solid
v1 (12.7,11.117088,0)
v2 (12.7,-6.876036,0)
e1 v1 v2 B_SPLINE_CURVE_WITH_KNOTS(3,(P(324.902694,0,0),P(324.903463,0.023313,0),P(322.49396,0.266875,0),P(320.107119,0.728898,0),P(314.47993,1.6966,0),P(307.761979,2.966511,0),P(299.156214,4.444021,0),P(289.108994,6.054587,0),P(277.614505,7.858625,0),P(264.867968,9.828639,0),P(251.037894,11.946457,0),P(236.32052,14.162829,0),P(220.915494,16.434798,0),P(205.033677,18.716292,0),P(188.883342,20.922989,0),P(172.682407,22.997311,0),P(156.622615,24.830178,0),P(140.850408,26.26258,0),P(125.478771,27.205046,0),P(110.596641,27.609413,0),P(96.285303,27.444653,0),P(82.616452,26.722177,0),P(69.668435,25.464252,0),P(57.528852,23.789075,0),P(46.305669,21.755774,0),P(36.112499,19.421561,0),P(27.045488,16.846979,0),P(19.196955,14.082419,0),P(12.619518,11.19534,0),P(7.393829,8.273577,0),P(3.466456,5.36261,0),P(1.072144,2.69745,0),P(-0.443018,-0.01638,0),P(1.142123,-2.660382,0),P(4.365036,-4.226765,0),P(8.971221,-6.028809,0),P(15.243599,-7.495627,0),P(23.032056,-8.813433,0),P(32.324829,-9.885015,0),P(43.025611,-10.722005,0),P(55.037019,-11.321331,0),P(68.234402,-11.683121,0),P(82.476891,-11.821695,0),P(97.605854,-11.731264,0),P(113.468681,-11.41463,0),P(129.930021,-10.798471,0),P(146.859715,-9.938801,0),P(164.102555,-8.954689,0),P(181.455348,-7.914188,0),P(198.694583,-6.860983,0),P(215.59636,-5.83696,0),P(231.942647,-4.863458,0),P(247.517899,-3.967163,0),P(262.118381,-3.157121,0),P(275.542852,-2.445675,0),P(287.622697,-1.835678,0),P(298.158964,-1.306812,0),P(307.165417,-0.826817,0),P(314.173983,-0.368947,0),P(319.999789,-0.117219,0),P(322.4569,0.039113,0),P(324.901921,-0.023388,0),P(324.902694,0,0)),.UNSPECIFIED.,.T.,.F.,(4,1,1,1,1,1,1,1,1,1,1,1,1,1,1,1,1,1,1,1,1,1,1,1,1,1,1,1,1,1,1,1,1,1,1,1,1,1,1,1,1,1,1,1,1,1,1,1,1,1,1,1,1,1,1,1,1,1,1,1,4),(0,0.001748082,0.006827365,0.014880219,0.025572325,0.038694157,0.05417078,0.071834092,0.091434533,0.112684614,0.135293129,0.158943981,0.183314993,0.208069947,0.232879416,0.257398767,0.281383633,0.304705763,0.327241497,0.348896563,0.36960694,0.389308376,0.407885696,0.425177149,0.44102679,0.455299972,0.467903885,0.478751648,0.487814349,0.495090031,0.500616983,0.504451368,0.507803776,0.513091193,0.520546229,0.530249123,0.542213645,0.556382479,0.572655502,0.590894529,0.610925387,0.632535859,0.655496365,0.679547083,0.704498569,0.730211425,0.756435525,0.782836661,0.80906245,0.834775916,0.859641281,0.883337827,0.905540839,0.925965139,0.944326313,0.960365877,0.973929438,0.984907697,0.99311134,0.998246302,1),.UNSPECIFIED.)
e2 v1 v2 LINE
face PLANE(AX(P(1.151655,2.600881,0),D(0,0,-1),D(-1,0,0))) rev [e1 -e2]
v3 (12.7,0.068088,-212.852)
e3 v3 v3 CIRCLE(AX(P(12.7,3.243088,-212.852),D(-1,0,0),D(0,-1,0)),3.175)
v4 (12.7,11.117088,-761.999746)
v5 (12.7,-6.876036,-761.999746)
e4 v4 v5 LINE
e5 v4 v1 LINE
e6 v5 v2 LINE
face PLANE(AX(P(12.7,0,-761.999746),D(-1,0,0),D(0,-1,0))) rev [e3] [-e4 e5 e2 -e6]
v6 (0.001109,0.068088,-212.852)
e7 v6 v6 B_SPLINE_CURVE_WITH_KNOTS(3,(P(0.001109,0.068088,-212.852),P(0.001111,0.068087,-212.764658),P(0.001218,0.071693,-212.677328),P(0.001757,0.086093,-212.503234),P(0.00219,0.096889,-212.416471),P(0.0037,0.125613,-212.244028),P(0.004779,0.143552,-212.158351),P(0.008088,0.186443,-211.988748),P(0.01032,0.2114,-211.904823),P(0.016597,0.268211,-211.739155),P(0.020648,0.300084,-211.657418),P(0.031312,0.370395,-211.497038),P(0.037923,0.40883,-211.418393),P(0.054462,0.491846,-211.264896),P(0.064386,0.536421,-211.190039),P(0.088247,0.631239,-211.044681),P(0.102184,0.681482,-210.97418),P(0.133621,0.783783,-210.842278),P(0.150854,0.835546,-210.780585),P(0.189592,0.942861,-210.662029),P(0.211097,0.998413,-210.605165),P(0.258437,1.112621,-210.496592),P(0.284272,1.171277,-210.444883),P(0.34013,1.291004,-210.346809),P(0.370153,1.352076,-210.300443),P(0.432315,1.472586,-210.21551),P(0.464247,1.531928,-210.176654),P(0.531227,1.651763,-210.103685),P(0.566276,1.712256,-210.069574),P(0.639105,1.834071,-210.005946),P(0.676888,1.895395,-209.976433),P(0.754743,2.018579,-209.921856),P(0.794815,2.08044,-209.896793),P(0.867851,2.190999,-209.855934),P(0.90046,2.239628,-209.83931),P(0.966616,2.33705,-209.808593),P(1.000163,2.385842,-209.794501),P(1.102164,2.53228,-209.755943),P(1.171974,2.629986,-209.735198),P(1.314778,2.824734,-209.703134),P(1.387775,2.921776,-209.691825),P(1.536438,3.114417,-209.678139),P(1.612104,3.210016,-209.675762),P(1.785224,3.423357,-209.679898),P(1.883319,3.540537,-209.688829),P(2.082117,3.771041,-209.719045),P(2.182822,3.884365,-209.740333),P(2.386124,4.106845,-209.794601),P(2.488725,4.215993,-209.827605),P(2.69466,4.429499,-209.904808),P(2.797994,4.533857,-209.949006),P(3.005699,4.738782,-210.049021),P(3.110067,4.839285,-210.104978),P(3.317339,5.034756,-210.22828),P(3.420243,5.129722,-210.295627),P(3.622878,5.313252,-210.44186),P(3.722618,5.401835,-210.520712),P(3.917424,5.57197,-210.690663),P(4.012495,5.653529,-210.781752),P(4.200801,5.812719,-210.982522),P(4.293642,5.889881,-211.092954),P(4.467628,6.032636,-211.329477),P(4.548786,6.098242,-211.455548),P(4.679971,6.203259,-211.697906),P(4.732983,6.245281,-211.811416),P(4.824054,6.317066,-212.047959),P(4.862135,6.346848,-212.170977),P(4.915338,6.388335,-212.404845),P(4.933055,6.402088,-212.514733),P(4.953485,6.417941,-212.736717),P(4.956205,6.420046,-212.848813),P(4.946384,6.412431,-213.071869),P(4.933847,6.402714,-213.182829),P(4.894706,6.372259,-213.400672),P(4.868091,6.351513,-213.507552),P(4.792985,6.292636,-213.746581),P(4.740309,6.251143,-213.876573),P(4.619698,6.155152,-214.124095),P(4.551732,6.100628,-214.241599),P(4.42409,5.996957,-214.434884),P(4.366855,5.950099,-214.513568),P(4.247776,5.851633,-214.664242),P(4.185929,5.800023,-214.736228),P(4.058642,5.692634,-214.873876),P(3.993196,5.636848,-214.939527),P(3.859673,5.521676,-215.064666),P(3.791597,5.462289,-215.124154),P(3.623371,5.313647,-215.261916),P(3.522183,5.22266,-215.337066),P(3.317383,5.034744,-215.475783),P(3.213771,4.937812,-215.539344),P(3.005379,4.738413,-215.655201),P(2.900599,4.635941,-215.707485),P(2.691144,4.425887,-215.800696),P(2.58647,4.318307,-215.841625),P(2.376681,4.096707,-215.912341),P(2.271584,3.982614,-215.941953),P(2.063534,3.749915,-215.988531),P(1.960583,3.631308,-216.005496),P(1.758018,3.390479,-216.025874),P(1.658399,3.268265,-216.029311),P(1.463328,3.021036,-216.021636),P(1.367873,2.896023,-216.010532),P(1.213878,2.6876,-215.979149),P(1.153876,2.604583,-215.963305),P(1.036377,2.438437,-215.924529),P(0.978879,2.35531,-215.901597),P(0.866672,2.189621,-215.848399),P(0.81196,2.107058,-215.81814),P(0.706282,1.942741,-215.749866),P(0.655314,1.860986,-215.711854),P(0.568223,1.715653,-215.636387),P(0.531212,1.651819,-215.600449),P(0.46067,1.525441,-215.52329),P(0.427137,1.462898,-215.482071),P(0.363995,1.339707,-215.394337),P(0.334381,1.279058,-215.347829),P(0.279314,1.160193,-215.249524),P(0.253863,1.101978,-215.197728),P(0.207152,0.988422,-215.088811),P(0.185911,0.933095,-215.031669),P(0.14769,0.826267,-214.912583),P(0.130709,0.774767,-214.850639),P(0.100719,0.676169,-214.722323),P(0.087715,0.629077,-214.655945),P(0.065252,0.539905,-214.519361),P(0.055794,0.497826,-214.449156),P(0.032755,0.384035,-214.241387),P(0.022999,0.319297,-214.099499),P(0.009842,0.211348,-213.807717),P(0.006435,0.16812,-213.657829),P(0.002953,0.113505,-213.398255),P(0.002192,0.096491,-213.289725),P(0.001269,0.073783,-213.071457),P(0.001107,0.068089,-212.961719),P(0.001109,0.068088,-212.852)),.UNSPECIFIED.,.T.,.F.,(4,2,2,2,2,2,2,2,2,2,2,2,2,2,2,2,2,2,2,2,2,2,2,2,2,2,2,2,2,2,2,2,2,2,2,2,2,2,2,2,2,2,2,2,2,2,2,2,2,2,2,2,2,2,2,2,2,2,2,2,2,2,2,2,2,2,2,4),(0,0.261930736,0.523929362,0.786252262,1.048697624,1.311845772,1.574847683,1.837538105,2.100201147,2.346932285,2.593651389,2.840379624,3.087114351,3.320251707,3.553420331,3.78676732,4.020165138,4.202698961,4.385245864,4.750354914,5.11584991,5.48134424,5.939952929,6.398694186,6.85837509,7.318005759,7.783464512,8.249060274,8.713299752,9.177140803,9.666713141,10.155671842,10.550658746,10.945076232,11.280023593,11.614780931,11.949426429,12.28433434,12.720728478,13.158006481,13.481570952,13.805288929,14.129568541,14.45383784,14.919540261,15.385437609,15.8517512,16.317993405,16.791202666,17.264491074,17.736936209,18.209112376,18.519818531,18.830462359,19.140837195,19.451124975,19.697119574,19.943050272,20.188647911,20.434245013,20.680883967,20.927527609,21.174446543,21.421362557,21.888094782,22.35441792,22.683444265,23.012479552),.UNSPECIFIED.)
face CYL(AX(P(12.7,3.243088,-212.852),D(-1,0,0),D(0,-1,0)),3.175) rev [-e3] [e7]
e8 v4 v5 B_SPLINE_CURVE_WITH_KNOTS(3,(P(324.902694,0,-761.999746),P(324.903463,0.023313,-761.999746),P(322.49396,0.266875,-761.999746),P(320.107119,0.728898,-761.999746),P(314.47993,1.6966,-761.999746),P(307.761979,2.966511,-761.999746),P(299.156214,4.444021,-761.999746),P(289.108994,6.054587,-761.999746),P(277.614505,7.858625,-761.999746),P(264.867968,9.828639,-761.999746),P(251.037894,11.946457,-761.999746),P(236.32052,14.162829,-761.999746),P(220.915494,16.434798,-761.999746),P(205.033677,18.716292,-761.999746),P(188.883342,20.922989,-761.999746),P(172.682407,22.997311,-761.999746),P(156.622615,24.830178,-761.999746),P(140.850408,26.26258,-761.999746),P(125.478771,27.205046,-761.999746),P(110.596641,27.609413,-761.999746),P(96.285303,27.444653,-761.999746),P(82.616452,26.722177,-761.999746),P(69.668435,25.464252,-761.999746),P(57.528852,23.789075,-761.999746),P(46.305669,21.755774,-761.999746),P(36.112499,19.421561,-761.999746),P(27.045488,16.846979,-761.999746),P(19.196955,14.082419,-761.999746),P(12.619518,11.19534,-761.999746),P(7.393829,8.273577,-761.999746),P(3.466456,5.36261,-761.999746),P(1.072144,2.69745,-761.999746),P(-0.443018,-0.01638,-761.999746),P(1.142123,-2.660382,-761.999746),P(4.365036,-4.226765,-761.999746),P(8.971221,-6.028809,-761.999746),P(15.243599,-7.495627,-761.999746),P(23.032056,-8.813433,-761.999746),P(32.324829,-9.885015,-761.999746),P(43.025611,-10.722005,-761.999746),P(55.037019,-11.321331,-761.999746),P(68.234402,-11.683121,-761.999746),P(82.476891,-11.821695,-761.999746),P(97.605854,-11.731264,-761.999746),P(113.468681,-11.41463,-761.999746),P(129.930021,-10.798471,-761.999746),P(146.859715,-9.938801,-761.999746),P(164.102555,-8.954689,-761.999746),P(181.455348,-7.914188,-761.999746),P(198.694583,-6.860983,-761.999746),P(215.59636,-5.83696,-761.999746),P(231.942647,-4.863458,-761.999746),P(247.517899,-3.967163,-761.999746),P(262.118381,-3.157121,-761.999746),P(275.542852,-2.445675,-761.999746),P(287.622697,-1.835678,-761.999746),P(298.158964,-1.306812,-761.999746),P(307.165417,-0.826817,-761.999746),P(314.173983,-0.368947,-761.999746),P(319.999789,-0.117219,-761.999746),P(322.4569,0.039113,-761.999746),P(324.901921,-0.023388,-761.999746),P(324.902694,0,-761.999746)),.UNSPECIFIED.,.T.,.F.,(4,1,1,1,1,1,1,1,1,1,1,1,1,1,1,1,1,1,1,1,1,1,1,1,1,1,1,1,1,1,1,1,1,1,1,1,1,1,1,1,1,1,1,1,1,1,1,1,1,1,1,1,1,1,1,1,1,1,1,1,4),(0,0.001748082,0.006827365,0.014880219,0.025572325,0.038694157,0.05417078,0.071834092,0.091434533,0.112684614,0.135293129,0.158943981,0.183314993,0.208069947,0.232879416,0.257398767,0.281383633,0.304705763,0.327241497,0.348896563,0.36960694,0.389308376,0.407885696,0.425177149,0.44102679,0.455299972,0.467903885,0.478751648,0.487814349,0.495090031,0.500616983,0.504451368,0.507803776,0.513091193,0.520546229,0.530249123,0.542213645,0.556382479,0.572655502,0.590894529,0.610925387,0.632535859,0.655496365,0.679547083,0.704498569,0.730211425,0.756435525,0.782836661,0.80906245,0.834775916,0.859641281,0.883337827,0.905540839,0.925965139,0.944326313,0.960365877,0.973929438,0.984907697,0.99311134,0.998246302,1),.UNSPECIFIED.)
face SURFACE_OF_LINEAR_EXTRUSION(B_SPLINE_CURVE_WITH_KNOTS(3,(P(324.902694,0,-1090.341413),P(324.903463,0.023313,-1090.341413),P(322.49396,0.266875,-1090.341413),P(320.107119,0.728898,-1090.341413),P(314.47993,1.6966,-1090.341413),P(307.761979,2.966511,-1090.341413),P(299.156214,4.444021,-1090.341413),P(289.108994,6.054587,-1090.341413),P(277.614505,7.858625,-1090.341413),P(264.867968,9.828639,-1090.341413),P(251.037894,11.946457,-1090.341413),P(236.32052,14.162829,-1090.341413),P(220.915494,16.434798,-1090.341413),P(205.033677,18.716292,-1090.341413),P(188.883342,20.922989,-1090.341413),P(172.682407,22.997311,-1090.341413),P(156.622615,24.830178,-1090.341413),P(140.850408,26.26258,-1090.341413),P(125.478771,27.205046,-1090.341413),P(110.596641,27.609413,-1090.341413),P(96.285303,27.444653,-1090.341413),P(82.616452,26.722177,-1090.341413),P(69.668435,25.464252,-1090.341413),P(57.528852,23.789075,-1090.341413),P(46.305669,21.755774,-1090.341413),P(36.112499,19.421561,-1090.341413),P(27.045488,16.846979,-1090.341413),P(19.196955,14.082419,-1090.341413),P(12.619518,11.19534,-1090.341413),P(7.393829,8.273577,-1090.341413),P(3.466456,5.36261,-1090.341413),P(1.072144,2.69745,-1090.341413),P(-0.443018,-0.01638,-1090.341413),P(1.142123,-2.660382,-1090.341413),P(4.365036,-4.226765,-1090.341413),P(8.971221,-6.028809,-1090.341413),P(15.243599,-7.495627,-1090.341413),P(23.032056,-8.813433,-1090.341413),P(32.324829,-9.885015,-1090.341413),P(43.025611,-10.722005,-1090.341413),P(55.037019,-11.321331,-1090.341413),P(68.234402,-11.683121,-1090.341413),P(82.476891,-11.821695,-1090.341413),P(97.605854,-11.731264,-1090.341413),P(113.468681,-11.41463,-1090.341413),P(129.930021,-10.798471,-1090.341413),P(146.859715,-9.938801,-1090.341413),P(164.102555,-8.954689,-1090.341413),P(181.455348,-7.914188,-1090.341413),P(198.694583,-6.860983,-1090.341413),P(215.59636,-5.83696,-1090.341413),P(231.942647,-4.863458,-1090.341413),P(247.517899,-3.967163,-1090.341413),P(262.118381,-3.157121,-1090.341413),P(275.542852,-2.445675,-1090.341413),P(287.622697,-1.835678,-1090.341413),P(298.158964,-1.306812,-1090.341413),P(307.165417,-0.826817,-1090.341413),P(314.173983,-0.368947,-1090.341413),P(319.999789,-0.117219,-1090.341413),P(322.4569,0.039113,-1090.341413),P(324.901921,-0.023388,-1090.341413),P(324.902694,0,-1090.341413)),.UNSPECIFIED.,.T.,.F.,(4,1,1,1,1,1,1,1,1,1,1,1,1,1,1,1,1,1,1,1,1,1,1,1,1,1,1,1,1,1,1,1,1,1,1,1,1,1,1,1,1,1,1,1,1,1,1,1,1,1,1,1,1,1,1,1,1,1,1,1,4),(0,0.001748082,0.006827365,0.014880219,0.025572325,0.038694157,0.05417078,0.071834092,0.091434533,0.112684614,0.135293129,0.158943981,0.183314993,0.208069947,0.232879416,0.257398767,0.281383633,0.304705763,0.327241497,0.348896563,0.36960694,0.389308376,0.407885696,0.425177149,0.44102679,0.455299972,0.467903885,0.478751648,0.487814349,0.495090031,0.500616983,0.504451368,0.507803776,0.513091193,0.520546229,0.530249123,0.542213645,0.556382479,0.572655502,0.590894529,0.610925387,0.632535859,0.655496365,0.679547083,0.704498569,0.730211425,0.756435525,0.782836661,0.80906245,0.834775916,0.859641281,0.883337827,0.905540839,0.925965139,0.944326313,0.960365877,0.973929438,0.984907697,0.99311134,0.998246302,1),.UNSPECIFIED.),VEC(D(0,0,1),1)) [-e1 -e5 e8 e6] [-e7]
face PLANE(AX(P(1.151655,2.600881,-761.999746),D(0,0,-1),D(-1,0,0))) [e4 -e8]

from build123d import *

# Parameters (mm, degrees)
BOSS_EXTRUDE2_DEPTH = 761.999746
CUT_EXTRUDE1_START  = -761.999746
CUT_EXTRUDE1_DEPTH  = 761.999746
SKETCH3_R           = 3.175
CUT_EXTRUDE2_DEPTH  = 763.18665214


# Read off the part's stored shape, not the designer's step: Cut-Extrude1
with BuildPart() as part:
    # Sketch2 → Boss-Extrude2 (new body)
    with BuildSketch(Plane.XY):
        with BuildLine():
            add(Edge.make_bspline(
                [(324.902693551, 0), (324.903463196, 0.023313358), (322.493960125, 0.266874853), (320.107118726, 0.728898482), (314.479929879, 1.696599545), (307.761979309, 2.966510847), (299.156213966, 4.44402059), (289.108994082, 6.054587212), (277.614504557, 7.858625418), (264.867967682, 9.828639283), (251.037893607, 11.946456865), (236.320520328, 14.162828682), (220.915494029, 16.434797842), (205.033677241, 18.716292105), (188.883341887, 20.922988597), (172.682407247, 22.997310524), (156.622614565, 24.830178487), (140.850407651, 26.262579625), (125.478771128, 27.205045845), (110.596641232, 27.609413226), (96.285303339, 27.444653165), (82.616452357, 26.722177249), (69.668434964, 25.464252485), (57.528852266, 23.789075325), (46.305668853, 21.755773795), (36.112498821, 19.421560607), (27.045487678, 16.846978605), (19.196955025, 14.082419467), (12.619518254, 11.195340149), (7.393829249, 8.273577005), (3.466455599, 5.362609604), (1.07214418, 2.697450283), (-0.443018312, -0.016380309), (1.142123289, -2.660381571), (4.36503606, -4.226764571), (8.971221404, -6.028809419), (15.243598774, -7.49562747), (23.03205608, -8.813433078), (32.324829104, -9.885015211), (43.025610851, -10.722004925), (55.037019029, -11.32133074), (68.234402161, -11.683120574), (82.476890937, -11.821694636), (97.60585357, -11.731263556), (113.468681032, -11.414630367), (129.930020513, -10.79847052), (146.859715047, -9.938801137), (164.102555428, -8.954688629), (181.455347718, -7.914187903), (198.694582839, -6.86098311), (215.596359861, -5.836960409), (231.942646987, -4.863457625), (247.517899408, -3.967162621), (262.118380872, -3.157120583), (275.542852028, -2.445675428), (287.622696903, -1.835678138), (298.158964313, -1.306811978), (307.16541669, -0.826816664), (314.173983408, -0.368946975), (319.99978897, -0.117218531), (322.45689994, 0.039112512), (324.901921434, -0.023388259), (324.902693551, 0)],
                knots=[0, 0, 0, 0, 0.001748082, 0.006827365, 0.014880219, 0.025572325, 0.038694157, 0.05417078, 0.071834092, 0.091434533, 0.112684614, 0.135293129, 0.158943981, 0.183314993, 0.208069947, 0.232879416, 0.257398767, 0.281383633, 0.304705763, 0.327241497, 0.348896563, 0.36960694, 0.389308376, 0.407885696, 0.425177149, 0.44102679, 0.455299972, 0.467903885, 0.478751648, 0.487814349, 0.495090031, 0.500616983, 0.504451368, 0.507803776, 0.513091193, 0.520546229, 0.530249123, 0.542213645, 0.556382479, 0.572655502, 0.590894529, 0.610925387, 0.632535859, 0.655496365, 0.679547083, 0.704498569, 0.730211425, 0.756435525, 0.782836661, 0.80906245, 0.834775916, 0.859641281, 0.883337827, 0.905540839, 0.925965139, 0.944326313, 0.960365877, 0.973929438, 0.984907697, 0.99311134, 0.998246302, 1, 1, 1, 1], degree=3))
        make_face()
    extrude(amount=-BOSS_EXTRUDE2_DEPTH)

    # Cut-Extrude1 outline → Cut-Extrude1 (cut)
    with BuildSketch(Plane.XY.offset(CUT_EXTRUDE1_START)):
        with BuildLine():
            add(Edge.make_bspline(
                [(324.902693551, 0), (324.903463196, 0.023313358), (322.493960125, 0.266874853), (320.107118726, 0.728898482), (314.479929879, 1.696599545), (307.761979309, 2.966510847), (299.156213966, 4.44402059), (289.108994082, 6.054587212), (277.614504557, 7.858625418), (264.867967682, 9.828639283), (251.037893607, 11.946456865), (236.320520328, 14.162828682), (220.915494029, 16.434797842), (205.033677241, 18.716292105), (188.883341887, 20.922988597), (172.682407247, 22.997310524), (156.622614565, 24.830178487), (140.850407651, 26.262579625), (125.478771128, 27.205045845), (110.596641232, 27.609413226), (96.285303339, 27.444653165), (82.616452357, 26.722177249), (69.668434964, 25.464252485), (57.528852266, 23.789075325), (46.305668853, 21.755773795), (36.112498821, 19.421560607), (27.045487678, 16.846978605), (19.3313577, 14.129761328), (14.714314762, 12.114502523), (12.7, 11.117087729)],
                knots=[0, 0, 0, 0, 0.001748082, 0.006827365, 0.014880219, 0.025572325, 0.038694157, 0.05417078, 0.071834092, 0.091434533, 0.112684614, 0.135293129, 0.158943981, 0.183314993, 0.208069947, 0.232879416, 0.257398767, 0.281383633, 0.304705763, 0.327241497, 0.348896563, 0.36960694, 0.389308376, 0.407885696, 0.425177149, 0.44102679, 0.455299972, 0.467903885, 0.478105627, 0.478105627, 0.478105627, 0.478105627], degree=3))
            Line((12.7, 11.117087729), (12.7, -6.876035615))
            add(Edge.make_bspline(
                [(12.7, -6.876035615), (13.386291094, -7.033779246), (16.659123202, -7.735133954), (23.03205608, -8.813433078), (32.324829104, -9.885015211), (43.025610851, -10.722004925), (55.037019029, -11.32133074), (68.234402161, -11.683120574), (82.476890937, -11.821694636), (97.60585357, -11.731263556), (113.468681032, -11.414630367), (129.930020513, -10.79847052), (146.859715047, -9.938801137), (164.102555428, -8.954688629), (181.455347718, -7.914187903), (198.694582839, -6.86098311), (215.596359861, -5.836960409), (231.942646987, -4.863457625), (247.517899408, -3.967162621), (262.118380872, -3.157120583), (275.542852028, -2.445675428), (287.622696903, -1.835678138), (298.158964313, -1.306811978), (307.16541669, -0.826816664), (314.173983408, -0.368946975), (319.99978897, -0.117218531), (322.45689994, 0.039112512), (324.901921434, -0.023388259), (324.902693551, 0)],
                knots=[0.52705934, 0.52705934, 0.52705934, 0.52705934, 0.530249123, 0.542213645, 0.556382479, 0.572655502, 0.590894529, 0.610925387, 0.632535859, 0.655496365, 0.679547083, 0.704498569, 0.730211425, 0.756435525, 0.782836661, 0.80906245, 0.834775916, 0.859641281, 0.883337827, 0.905540839, 0.925965139, 0.944326313, 0.960365877, 0.973929438, 0.984907697, 0.99311134, 0.998246302, 1, 1, 1, 1], degree=3))
        make_face()
    extrude(amount=CUT_EXTRUDE1_DEPTH, mode=Mode.SUBTRACT)

    # Sketch3 → Cut-Extrude2 (cut, through all)
    with BuildSketch(Plane.ZY):
        with Locations(Location((-212.852, 3.243087729, 0), (0, 0, 270))):
            Circle(SKETCH3_R)
    extrude(amount=-CUT_EXTRUDE2_DEPTH, mode=Mode.SUBTRACT)


solid = part.part
